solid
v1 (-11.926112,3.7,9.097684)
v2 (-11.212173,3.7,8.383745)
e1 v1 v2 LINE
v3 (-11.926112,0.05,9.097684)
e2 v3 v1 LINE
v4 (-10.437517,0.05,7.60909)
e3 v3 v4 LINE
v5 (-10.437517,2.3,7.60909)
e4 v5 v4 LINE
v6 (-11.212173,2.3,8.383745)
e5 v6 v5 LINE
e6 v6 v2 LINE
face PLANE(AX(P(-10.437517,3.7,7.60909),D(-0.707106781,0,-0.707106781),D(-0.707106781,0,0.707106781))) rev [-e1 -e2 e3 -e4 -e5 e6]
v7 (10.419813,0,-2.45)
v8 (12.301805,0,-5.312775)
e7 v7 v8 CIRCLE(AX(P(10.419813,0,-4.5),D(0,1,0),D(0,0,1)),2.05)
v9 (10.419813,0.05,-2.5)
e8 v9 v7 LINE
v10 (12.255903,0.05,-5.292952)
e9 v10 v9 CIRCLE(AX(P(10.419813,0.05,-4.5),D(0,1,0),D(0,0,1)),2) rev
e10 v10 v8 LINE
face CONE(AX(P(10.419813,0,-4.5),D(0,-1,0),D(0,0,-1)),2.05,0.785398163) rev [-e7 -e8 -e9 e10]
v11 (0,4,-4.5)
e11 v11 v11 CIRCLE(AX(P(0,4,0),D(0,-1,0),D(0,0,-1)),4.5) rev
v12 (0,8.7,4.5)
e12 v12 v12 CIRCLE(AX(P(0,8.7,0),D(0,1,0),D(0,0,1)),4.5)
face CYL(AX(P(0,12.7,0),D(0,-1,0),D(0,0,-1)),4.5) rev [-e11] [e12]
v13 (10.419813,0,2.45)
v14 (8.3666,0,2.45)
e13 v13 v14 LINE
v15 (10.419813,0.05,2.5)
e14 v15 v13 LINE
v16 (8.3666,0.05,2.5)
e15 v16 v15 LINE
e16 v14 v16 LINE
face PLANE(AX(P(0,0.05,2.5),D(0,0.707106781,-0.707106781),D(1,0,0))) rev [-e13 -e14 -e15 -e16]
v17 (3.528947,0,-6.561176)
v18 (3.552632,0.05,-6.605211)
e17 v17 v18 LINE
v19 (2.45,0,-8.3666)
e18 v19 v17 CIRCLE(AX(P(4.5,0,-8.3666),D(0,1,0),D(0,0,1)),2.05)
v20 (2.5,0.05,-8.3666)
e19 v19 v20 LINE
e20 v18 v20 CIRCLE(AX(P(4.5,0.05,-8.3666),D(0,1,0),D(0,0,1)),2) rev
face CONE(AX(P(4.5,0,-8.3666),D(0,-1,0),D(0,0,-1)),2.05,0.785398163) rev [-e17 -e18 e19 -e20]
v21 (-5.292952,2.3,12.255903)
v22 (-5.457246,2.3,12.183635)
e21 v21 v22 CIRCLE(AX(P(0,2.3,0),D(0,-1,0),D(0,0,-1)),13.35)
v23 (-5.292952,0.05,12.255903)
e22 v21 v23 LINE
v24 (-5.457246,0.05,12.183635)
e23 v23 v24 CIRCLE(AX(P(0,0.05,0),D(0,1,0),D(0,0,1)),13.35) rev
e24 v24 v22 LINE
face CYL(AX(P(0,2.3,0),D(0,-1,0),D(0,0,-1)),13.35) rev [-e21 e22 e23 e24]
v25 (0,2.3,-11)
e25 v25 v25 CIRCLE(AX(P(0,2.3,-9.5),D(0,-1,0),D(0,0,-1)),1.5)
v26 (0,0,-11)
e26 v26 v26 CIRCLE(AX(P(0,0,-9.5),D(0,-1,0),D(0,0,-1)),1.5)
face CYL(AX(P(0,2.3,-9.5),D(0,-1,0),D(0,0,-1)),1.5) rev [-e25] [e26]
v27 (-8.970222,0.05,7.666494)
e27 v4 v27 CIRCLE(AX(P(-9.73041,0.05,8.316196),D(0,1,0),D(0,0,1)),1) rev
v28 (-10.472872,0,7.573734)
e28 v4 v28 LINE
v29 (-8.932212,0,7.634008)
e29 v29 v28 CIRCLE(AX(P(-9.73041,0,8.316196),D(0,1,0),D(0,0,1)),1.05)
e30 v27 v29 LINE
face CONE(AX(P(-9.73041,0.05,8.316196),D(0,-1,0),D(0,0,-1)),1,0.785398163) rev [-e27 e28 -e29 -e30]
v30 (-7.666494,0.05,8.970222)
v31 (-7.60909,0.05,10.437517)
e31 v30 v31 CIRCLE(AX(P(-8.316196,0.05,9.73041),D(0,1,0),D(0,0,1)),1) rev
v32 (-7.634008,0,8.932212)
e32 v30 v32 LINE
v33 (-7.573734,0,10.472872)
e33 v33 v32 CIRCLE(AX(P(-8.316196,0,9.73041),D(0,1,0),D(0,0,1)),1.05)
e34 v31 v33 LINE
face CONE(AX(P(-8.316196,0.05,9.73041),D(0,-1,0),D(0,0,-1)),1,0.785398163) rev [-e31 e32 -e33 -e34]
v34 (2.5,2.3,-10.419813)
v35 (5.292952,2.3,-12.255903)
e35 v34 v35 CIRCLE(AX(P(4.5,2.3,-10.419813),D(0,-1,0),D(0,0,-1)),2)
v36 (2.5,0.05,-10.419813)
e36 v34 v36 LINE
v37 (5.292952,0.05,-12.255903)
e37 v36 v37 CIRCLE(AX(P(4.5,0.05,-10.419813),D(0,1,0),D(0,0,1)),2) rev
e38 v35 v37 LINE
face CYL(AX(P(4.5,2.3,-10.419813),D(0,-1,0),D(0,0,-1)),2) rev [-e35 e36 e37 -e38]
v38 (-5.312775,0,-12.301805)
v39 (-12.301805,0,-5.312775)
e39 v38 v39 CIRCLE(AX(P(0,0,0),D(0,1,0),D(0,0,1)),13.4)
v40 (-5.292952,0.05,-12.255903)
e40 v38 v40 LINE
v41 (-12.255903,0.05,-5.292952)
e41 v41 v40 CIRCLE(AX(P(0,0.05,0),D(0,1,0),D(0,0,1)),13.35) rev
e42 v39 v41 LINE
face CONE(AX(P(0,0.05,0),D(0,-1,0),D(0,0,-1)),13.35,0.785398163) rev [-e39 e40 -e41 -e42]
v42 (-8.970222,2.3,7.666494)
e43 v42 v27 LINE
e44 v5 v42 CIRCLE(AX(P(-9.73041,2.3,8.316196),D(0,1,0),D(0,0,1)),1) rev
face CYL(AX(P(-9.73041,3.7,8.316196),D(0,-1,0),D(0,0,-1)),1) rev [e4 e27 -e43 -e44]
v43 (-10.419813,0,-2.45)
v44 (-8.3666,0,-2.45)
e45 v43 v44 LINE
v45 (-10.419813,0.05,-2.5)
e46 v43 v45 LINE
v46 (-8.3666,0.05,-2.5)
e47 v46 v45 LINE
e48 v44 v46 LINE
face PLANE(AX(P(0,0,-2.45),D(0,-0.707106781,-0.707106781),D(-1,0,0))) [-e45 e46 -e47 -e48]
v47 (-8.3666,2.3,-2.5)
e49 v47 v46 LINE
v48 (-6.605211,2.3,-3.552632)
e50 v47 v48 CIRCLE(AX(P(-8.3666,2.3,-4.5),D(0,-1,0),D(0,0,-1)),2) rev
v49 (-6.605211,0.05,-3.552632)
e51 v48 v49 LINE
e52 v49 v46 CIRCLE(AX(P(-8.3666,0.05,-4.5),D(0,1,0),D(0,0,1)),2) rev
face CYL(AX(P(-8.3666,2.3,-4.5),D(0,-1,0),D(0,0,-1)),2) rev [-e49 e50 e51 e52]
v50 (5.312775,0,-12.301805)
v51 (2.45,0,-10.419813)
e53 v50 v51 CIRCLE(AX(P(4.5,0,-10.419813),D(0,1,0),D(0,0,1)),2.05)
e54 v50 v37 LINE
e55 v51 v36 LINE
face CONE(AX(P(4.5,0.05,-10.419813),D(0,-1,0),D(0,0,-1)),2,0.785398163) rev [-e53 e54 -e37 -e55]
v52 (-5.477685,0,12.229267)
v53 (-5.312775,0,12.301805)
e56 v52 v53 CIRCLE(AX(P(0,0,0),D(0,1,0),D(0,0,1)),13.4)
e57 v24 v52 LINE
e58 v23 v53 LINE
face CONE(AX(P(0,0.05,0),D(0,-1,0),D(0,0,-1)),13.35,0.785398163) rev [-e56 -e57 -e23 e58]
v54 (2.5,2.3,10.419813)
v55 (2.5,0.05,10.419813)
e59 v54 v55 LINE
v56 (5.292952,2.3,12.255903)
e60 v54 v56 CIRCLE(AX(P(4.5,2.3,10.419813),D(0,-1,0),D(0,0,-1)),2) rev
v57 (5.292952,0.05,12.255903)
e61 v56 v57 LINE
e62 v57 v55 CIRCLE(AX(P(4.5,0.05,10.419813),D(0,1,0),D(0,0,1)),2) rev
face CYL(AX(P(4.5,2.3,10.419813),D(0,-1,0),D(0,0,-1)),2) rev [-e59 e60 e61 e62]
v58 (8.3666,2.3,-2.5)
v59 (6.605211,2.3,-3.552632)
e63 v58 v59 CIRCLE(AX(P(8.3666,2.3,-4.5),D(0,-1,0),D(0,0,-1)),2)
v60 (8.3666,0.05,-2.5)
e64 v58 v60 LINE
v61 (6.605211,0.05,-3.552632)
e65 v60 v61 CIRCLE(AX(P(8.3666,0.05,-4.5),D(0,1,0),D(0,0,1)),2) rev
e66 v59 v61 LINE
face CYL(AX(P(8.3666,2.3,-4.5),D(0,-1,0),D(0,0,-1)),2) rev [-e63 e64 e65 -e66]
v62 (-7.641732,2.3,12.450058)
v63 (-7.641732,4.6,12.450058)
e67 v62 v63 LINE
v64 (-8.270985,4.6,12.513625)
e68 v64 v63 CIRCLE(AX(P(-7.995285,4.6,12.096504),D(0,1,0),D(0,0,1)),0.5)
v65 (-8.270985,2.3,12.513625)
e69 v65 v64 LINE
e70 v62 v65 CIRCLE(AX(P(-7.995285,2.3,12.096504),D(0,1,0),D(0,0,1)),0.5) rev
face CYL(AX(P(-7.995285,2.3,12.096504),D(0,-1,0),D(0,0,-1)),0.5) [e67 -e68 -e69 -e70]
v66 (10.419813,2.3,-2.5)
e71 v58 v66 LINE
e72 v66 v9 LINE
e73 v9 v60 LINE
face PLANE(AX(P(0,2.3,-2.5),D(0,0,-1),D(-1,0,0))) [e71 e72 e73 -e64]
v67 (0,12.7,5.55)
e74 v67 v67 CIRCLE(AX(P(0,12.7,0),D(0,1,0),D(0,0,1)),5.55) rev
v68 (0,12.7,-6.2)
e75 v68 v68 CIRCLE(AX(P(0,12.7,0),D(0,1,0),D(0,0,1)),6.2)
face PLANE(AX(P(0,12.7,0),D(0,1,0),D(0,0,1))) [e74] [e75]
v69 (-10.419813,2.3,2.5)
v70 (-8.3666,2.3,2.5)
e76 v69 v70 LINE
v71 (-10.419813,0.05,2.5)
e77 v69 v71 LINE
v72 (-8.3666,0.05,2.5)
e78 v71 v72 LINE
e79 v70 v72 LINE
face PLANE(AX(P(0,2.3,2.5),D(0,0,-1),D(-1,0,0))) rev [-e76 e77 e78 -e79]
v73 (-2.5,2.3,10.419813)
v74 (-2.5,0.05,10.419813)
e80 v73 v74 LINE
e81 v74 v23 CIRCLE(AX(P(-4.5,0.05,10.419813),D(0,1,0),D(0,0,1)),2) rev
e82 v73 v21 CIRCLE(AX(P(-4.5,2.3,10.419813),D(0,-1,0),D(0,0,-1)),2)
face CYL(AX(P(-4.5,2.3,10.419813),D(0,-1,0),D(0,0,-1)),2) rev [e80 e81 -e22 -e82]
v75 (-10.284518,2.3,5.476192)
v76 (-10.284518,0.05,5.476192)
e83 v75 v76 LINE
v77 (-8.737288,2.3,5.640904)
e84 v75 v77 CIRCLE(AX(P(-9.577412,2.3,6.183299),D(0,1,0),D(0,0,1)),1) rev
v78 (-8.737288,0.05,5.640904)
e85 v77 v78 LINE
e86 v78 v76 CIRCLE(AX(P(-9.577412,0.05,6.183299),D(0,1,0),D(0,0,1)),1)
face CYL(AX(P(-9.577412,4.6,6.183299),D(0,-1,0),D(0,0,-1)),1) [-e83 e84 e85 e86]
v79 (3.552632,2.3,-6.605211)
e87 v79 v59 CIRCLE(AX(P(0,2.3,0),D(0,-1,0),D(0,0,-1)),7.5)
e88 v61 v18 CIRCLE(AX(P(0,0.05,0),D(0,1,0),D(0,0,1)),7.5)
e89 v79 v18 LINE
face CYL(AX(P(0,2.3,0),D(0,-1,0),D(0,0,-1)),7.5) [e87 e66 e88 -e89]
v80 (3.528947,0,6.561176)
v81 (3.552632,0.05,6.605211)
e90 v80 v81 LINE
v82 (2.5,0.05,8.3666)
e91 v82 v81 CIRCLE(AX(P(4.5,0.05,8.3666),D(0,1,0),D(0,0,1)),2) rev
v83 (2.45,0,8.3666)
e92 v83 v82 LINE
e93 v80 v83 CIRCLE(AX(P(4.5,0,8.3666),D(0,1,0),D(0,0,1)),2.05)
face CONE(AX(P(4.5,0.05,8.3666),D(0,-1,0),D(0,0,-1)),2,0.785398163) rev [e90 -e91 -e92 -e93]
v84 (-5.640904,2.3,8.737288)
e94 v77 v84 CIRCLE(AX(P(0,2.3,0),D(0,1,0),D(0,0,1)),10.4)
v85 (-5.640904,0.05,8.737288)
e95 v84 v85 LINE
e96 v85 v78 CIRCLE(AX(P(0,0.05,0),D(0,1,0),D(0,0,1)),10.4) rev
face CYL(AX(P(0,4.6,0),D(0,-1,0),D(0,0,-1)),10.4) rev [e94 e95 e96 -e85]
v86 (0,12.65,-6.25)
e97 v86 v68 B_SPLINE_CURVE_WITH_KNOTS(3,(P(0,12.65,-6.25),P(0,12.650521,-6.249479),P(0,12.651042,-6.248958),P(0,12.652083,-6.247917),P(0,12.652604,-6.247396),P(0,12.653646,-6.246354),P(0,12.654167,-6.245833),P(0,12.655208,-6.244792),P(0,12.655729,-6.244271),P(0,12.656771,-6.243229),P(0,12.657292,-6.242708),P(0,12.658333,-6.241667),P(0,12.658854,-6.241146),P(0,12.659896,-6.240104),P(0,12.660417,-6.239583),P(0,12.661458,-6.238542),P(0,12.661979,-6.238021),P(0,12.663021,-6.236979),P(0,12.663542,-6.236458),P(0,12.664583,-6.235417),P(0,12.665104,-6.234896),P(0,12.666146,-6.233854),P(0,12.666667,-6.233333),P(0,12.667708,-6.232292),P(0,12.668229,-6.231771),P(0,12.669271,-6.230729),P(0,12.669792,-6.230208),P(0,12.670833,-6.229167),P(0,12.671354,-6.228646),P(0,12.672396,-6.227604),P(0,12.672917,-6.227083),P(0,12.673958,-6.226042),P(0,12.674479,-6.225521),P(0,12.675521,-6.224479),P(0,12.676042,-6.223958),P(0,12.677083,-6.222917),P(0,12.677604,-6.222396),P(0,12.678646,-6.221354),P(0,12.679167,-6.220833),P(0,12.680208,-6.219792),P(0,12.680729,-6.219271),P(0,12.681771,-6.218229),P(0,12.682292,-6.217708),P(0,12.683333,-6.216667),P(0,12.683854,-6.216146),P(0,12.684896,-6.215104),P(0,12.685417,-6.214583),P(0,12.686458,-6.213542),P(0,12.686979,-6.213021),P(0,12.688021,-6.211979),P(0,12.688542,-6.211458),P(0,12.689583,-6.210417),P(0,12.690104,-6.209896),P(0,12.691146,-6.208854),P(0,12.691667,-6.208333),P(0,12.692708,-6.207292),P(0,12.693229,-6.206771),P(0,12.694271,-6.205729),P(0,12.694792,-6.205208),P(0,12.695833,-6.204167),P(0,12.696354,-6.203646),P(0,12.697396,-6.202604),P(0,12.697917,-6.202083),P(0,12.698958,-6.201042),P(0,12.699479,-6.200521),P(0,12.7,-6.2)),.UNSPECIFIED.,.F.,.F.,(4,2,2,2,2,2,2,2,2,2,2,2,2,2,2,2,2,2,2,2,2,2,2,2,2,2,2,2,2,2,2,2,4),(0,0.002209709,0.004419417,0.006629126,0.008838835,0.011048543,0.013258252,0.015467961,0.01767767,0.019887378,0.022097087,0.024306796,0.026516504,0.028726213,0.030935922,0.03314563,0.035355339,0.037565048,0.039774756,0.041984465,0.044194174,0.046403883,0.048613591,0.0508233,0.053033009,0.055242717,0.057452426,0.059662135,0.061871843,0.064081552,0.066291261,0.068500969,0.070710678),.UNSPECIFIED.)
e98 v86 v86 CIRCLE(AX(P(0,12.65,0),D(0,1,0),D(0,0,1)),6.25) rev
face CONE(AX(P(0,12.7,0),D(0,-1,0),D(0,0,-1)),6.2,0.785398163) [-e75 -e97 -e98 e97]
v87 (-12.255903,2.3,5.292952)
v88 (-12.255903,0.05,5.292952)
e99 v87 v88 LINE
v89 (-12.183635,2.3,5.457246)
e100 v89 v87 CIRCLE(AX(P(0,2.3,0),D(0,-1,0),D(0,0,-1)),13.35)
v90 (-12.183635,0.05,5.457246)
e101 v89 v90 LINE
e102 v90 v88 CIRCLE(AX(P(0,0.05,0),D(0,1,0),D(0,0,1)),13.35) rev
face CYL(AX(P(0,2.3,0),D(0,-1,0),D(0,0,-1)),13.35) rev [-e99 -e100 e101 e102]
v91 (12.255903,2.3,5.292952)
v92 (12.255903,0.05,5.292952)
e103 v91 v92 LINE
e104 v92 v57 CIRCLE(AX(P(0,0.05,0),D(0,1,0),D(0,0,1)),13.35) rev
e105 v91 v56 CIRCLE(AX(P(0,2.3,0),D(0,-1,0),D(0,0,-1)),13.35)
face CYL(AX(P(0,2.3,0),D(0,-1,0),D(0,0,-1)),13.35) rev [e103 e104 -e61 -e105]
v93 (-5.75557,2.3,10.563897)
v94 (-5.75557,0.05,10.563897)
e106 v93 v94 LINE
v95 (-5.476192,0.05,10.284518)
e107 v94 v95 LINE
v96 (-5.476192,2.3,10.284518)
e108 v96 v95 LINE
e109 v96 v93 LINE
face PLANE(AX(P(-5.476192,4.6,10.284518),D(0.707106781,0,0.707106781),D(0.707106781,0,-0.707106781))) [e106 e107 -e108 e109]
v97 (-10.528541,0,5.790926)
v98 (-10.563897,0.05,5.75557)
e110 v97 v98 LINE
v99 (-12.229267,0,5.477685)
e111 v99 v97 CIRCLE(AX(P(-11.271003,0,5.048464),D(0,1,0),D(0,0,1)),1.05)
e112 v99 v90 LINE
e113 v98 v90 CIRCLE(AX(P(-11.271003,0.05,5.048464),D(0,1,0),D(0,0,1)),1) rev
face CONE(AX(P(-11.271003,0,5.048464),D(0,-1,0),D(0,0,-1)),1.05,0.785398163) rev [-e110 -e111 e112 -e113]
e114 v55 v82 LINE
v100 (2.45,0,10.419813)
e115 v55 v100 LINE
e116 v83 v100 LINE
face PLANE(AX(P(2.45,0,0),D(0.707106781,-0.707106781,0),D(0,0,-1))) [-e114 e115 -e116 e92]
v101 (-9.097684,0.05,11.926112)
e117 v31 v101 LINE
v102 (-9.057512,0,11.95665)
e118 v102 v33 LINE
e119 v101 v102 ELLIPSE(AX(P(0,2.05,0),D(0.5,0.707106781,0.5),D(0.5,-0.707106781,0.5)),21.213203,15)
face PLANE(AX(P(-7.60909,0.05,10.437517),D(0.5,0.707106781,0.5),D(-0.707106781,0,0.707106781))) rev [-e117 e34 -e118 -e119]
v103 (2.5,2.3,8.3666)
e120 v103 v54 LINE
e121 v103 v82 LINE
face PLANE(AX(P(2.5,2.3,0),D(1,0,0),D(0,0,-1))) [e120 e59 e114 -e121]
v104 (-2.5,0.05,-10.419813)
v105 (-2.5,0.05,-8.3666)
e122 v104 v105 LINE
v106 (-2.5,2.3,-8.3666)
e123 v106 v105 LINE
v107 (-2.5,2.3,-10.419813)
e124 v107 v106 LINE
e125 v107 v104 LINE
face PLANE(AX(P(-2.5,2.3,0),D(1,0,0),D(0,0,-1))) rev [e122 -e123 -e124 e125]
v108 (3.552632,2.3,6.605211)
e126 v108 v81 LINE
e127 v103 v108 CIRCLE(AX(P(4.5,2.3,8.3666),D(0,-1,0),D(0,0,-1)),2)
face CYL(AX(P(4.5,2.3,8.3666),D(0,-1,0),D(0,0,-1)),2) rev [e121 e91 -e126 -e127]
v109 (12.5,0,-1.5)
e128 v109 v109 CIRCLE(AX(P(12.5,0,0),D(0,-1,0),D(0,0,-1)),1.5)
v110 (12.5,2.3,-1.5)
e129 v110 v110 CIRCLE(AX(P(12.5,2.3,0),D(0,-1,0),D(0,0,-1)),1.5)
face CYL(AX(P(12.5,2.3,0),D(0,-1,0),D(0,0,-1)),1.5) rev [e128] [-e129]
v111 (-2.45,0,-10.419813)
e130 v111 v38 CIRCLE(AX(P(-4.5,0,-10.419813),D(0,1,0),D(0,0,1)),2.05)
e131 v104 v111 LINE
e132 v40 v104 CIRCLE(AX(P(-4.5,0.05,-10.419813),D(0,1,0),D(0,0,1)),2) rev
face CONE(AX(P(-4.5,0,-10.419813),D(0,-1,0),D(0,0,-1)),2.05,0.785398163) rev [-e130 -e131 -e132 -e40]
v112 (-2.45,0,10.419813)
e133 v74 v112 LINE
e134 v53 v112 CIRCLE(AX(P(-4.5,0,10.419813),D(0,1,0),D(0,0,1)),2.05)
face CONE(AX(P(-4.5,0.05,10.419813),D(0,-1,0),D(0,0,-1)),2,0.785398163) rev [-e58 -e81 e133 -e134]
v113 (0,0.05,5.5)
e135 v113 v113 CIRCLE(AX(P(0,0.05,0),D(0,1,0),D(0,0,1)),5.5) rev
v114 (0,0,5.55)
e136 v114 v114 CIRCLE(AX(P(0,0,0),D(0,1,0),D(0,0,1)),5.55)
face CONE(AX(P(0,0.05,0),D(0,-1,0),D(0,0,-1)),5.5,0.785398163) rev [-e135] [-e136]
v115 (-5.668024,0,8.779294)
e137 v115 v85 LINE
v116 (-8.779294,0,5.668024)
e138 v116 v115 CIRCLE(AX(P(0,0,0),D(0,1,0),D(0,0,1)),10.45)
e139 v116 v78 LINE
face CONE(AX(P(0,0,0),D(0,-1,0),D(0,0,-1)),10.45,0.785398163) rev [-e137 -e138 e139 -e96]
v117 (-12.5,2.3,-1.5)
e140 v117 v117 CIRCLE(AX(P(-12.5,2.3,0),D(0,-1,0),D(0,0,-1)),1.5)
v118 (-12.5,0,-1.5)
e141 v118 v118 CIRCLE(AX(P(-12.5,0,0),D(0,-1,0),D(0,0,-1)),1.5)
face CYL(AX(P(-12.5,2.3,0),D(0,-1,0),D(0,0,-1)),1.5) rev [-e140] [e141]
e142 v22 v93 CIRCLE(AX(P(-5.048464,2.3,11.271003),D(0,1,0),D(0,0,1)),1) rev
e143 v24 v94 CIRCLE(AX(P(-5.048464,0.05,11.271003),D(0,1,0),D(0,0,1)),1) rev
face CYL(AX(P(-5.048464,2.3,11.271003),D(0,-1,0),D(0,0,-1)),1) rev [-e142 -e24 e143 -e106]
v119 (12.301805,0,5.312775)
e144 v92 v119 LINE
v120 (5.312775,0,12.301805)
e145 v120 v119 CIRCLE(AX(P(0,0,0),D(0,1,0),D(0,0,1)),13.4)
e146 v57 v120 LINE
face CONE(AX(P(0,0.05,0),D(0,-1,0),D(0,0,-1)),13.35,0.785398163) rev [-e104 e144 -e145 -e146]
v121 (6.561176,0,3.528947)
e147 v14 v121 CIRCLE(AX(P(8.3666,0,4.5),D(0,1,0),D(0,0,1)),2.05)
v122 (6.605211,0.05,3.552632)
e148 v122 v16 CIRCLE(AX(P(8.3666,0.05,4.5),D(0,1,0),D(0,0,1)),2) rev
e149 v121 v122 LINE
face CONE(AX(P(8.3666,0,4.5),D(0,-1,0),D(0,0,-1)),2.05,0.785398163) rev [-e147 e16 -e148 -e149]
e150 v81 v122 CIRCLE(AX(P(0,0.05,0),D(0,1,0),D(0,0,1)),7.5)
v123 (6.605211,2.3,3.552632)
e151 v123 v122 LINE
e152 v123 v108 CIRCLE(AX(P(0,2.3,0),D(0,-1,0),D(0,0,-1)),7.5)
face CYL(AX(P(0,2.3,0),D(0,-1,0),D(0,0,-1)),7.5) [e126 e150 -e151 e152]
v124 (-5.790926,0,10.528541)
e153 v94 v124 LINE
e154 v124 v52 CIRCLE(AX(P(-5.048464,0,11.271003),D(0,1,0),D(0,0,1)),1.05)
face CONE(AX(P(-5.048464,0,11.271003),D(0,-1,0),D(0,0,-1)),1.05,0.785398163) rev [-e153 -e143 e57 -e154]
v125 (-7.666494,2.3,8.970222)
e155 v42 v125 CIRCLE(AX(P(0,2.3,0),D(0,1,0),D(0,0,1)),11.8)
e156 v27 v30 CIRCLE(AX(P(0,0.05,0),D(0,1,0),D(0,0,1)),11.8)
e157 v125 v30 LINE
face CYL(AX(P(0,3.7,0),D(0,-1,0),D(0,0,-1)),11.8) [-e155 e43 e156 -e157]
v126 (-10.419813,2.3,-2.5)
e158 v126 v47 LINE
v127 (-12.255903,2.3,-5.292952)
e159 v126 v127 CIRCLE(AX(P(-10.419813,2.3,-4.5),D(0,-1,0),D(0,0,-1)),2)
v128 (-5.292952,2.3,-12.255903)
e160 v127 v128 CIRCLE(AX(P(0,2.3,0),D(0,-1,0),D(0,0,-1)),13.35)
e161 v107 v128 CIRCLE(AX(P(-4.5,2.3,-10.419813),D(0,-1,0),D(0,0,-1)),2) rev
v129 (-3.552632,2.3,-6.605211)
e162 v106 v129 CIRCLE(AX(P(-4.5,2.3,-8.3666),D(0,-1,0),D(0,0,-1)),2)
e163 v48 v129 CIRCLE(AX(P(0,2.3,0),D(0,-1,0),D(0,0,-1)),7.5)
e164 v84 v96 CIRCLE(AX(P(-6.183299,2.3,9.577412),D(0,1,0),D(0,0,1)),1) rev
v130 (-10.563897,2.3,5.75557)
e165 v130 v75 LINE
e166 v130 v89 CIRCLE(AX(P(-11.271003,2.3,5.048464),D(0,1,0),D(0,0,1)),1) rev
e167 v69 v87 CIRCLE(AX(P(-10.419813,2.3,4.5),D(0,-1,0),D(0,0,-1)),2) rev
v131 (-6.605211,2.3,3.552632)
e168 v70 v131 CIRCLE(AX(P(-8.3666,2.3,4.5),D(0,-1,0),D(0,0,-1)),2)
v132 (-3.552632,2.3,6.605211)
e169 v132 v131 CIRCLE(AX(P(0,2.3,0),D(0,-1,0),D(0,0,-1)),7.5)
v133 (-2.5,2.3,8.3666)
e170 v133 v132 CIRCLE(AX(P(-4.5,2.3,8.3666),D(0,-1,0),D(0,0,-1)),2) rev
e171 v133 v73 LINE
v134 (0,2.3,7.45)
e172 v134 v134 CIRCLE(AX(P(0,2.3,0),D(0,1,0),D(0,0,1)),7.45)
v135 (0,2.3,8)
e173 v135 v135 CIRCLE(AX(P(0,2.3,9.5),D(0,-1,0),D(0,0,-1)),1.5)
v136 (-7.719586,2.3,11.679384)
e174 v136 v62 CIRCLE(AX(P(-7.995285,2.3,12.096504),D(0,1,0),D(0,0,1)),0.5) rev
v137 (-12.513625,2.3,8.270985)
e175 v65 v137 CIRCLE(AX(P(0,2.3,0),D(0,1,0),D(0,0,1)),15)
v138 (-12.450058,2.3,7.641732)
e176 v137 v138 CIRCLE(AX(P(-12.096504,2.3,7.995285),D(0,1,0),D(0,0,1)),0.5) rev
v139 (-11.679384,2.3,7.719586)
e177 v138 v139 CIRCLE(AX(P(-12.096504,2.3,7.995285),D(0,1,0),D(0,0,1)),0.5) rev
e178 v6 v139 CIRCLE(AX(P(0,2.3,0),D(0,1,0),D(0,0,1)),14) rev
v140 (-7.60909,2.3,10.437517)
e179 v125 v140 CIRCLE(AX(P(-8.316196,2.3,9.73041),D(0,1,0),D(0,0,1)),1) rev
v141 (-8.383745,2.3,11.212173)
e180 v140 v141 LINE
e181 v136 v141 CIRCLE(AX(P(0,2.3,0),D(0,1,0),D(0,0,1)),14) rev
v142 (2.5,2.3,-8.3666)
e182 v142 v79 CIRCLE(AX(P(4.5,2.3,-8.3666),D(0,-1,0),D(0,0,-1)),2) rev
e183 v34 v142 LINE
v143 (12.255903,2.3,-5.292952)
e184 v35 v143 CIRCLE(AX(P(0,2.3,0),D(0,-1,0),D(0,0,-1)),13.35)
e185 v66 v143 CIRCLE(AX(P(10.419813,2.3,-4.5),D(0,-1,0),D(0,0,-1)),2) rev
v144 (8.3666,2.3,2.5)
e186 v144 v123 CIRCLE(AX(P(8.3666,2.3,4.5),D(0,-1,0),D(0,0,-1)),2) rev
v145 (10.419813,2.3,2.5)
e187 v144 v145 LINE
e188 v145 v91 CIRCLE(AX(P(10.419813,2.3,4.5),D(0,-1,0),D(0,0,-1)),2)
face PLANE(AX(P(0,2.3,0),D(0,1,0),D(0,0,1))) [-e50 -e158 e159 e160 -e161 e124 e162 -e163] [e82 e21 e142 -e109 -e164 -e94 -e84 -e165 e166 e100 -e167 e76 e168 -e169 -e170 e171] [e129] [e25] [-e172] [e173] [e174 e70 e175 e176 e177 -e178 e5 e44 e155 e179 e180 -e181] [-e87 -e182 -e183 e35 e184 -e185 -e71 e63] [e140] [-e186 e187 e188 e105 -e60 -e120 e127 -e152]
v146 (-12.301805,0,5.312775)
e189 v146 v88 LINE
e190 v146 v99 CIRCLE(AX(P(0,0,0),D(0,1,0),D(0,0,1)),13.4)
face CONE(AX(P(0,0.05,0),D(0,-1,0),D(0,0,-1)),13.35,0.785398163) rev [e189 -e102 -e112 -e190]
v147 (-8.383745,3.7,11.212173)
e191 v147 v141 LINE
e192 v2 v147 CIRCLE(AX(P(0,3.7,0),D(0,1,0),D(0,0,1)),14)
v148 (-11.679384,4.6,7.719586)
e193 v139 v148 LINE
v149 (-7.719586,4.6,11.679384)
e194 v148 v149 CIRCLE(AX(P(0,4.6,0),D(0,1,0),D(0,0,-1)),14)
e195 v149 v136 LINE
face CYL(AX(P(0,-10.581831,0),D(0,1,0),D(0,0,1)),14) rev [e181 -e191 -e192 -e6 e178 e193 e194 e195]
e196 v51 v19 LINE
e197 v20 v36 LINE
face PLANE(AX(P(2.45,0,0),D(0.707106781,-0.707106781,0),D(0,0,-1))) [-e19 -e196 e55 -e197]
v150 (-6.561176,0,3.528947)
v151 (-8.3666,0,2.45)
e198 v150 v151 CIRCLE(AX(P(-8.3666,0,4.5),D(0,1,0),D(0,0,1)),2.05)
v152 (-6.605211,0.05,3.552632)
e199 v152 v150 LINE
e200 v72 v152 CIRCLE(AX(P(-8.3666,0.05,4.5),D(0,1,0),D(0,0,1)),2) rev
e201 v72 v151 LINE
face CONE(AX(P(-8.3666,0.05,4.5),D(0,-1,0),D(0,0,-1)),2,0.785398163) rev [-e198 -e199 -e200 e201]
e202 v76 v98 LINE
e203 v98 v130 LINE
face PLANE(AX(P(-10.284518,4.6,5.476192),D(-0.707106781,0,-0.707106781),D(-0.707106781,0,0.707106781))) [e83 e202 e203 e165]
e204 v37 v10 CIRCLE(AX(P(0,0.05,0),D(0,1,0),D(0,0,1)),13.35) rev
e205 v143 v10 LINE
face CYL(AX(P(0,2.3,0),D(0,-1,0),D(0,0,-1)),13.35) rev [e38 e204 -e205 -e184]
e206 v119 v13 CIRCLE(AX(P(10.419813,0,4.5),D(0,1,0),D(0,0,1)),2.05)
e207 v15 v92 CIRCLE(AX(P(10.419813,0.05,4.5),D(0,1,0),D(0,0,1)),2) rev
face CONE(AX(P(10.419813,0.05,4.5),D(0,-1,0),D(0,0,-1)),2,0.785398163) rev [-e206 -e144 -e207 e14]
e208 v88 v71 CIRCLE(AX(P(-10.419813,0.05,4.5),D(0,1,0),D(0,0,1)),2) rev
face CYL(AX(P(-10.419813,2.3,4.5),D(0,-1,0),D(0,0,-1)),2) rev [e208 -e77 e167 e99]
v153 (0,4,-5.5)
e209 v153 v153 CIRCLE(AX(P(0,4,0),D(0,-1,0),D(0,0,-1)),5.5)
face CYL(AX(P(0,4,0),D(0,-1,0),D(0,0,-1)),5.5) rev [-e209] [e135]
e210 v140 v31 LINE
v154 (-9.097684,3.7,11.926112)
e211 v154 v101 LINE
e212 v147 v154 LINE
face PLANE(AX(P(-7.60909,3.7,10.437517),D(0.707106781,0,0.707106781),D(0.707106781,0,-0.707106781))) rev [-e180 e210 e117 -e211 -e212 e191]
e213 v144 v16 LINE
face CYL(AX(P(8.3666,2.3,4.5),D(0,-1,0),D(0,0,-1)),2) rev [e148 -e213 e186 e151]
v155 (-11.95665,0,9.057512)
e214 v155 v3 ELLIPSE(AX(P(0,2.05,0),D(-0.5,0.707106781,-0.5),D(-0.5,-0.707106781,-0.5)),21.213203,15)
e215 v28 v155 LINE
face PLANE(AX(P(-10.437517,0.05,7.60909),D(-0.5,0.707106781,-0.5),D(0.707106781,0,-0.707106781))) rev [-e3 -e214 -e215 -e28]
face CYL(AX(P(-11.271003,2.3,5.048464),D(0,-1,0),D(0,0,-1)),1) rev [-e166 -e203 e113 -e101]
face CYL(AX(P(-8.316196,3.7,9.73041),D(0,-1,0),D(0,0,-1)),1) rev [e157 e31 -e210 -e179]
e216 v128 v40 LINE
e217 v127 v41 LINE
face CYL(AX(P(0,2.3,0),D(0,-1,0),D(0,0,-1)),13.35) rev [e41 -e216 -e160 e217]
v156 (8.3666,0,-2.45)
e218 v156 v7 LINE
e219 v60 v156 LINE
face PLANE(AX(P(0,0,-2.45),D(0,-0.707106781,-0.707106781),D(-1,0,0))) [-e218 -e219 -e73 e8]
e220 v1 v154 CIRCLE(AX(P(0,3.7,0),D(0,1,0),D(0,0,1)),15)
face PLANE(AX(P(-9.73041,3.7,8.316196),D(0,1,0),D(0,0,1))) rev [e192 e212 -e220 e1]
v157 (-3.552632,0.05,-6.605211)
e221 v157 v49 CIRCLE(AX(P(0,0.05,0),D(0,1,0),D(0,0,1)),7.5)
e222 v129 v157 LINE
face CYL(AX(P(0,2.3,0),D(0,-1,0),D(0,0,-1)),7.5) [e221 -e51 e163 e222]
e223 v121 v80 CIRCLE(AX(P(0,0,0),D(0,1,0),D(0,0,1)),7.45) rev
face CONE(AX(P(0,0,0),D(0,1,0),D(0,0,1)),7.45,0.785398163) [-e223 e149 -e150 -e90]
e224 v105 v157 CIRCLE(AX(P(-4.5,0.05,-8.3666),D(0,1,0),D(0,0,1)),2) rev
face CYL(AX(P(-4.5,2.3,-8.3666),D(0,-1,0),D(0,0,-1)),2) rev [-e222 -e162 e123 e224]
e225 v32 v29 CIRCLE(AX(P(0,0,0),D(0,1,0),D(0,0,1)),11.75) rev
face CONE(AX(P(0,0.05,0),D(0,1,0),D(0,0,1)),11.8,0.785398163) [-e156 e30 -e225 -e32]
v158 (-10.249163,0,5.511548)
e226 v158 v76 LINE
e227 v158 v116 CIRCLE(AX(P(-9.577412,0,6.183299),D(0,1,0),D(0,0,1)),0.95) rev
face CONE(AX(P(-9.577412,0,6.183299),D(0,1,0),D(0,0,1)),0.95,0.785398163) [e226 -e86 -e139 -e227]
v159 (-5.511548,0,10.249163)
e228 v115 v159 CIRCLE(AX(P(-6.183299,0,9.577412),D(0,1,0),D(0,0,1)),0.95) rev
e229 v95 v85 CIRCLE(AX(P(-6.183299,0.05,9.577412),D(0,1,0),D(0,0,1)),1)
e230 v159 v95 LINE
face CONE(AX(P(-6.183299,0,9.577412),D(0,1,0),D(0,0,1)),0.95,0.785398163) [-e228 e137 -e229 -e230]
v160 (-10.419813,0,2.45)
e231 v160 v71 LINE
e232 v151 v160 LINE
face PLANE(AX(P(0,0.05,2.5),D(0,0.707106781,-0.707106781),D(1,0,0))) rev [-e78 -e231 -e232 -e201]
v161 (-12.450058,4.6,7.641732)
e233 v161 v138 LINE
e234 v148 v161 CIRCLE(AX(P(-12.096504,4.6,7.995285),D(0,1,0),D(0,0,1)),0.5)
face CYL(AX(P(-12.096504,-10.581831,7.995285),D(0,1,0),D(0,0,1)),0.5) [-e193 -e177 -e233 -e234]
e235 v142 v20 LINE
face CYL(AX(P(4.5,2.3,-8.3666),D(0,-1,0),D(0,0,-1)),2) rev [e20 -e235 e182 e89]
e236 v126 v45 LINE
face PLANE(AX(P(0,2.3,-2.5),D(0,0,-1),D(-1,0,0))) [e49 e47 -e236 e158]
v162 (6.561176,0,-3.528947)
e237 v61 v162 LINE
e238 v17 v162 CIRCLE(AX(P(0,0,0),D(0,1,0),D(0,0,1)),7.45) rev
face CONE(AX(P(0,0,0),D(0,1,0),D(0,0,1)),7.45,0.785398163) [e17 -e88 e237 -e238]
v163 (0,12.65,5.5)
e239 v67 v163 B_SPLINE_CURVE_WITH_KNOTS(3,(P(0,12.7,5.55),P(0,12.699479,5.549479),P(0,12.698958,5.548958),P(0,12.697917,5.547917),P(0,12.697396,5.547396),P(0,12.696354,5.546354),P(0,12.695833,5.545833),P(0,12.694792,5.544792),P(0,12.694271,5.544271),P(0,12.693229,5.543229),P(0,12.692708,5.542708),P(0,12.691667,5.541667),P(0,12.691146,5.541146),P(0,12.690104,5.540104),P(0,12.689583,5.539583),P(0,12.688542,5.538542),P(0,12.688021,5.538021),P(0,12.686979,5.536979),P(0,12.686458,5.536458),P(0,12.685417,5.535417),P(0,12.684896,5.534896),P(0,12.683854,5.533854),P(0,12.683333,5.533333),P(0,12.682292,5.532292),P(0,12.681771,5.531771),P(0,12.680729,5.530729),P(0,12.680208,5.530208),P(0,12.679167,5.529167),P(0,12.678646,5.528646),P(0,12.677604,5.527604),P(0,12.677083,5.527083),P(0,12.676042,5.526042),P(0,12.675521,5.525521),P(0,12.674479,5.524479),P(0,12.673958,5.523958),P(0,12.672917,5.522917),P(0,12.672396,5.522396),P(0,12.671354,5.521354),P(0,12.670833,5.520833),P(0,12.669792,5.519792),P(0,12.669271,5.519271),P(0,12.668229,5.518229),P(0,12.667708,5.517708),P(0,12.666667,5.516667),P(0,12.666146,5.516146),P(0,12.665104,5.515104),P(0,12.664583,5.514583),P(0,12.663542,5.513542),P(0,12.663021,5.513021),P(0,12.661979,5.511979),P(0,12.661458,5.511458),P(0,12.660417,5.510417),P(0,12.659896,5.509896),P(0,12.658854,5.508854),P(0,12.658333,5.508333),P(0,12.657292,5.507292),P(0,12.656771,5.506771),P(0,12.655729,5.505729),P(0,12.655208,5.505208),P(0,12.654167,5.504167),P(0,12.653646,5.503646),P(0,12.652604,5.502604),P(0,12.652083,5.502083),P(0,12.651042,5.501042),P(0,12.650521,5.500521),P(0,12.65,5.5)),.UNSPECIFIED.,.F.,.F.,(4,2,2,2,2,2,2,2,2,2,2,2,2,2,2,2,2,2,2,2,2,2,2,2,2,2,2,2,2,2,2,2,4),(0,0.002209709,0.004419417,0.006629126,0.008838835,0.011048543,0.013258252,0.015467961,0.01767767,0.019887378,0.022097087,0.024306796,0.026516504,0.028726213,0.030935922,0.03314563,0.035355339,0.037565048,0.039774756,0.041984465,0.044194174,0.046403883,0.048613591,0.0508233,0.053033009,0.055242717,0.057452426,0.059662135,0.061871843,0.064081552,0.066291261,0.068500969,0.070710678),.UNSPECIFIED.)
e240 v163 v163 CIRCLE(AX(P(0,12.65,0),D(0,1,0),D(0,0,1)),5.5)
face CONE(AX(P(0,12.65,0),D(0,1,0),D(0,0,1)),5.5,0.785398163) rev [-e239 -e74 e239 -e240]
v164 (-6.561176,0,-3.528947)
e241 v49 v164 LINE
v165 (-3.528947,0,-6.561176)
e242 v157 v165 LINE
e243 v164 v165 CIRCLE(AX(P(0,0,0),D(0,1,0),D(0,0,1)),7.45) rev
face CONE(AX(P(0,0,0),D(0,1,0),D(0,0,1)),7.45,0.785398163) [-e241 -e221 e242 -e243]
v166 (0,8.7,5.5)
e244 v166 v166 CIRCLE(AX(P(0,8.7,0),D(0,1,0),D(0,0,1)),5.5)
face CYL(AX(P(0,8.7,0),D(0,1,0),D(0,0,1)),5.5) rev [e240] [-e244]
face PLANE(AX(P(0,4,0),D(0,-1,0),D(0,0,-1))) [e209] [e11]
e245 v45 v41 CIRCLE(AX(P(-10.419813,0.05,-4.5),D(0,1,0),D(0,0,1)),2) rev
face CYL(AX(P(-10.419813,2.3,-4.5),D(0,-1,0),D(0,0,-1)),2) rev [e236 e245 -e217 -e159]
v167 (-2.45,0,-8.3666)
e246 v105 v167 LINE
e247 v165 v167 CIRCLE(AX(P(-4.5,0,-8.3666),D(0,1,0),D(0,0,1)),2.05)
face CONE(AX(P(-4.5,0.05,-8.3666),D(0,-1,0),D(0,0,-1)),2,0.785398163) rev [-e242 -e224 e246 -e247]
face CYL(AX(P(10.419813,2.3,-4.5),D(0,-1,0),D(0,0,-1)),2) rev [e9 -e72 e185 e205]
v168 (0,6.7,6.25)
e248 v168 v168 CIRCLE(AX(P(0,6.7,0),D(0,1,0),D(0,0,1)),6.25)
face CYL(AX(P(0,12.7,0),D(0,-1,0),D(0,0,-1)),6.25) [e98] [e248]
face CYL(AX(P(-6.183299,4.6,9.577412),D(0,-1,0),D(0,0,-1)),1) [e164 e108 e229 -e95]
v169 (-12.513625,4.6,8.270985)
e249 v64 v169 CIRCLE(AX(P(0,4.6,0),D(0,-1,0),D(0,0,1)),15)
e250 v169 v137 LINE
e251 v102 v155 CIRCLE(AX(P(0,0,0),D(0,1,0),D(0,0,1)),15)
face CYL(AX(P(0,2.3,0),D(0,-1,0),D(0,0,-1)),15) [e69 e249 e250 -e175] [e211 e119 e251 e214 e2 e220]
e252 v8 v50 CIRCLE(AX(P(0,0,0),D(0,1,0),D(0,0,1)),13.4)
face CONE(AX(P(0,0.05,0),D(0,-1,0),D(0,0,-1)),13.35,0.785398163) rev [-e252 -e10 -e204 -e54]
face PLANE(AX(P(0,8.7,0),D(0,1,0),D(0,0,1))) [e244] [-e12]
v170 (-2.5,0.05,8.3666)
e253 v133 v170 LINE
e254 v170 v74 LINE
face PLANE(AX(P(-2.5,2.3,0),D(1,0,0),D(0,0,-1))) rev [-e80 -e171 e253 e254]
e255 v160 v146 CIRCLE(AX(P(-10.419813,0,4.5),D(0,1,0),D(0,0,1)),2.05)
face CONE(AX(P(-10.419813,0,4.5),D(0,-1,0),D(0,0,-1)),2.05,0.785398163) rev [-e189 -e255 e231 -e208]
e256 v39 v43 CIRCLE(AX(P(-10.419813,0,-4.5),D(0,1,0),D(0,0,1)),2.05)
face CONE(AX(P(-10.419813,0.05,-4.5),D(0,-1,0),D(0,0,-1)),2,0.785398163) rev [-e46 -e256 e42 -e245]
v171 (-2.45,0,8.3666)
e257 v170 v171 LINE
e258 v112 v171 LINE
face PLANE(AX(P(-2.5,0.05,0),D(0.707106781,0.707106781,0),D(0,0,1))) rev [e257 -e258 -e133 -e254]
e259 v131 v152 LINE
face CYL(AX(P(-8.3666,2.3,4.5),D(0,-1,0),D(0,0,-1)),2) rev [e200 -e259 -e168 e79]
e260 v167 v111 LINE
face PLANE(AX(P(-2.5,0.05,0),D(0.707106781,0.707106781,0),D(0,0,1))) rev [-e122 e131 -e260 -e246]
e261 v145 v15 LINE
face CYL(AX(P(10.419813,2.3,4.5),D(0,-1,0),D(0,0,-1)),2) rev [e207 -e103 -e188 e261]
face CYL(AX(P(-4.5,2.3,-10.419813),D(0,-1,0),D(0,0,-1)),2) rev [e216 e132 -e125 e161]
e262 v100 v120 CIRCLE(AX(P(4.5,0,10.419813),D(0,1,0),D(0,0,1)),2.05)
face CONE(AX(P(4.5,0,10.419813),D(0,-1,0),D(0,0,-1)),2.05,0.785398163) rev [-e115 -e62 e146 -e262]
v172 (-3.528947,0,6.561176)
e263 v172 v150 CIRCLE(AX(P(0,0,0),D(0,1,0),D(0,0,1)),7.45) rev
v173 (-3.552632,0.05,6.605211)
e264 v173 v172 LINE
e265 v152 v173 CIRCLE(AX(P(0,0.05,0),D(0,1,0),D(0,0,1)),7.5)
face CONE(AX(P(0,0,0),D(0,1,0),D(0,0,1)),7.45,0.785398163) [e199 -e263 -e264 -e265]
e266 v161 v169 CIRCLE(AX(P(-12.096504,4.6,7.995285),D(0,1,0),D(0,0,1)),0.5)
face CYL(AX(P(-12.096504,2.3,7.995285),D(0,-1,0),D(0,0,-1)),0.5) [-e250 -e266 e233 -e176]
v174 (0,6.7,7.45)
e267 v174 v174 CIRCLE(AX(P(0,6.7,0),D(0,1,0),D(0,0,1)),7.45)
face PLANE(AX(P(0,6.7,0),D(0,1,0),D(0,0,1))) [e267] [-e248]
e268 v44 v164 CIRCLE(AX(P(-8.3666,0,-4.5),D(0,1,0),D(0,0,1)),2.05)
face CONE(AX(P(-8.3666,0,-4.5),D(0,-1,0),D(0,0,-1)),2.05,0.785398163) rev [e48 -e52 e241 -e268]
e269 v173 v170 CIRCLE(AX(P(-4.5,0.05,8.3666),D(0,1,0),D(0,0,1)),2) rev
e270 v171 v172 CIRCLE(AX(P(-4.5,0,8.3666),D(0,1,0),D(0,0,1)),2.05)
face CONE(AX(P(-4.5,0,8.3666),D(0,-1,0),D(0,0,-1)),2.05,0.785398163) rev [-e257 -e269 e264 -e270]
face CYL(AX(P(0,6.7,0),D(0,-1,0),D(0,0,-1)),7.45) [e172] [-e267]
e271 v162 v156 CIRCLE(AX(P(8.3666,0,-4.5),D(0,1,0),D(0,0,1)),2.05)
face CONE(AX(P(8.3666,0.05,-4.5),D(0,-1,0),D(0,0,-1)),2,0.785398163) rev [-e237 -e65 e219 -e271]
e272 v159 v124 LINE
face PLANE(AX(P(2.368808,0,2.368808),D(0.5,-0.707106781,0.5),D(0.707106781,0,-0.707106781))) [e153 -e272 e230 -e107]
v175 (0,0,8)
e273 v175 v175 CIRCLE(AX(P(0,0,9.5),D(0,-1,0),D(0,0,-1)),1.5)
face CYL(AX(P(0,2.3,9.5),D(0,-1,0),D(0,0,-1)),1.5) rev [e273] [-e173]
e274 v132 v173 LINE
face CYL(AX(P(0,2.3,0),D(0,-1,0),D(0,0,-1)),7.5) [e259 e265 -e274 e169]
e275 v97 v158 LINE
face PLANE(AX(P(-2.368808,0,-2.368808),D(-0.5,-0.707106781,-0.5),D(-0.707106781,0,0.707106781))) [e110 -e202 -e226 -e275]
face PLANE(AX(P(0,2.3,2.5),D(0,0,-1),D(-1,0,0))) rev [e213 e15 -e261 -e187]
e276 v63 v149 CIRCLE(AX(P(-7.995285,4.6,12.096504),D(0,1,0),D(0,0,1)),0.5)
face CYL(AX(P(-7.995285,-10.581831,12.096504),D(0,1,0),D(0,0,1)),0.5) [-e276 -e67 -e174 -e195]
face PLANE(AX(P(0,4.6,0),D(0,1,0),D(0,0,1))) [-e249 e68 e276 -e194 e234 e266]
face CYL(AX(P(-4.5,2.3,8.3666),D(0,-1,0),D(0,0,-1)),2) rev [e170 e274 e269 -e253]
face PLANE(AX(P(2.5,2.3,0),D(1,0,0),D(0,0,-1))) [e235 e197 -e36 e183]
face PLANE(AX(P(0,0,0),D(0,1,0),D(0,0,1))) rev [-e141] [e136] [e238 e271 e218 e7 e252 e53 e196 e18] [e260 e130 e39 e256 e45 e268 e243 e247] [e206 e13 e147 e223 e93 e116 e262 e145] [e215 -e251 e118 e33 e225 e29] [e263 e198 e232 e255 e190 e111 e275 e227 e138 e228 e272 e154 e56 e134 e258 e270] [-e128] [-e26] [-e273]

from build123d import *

# Parameters (mm, degrees)
SKETCH_1_R          = 15
EXTRUDE_1_DEPTH     = 2.3
SKETCH_2_R          = 1.5
CUT_EXTRUDE_1_DEPTH = 2.3
EXTRUDE_2_DEPTH     = 4.6
CUT_EXTRUDE_2_DEPTH = 3.7
CUT_EXTRUDE_START   = -2.3
CUT_EXTRUDE_3_DEPTH = 2.3
FILLET_1_R          = 1
SKETCH_6_R          = 7.45
EXTRUDE_3_DEPTH     = 4.4
SKETCH_7_R          = 6.25
EXTRUDE_4_DEPTH     = 6
SKETCH_8_R          = 5.5
CUT_EXTRUDE_4_DEPTH = 4
SKETCH_9_R          = 4.5
CUT_EXTRUDE_5_DEPTH = 25.724279565
CUT_EXTRUDE_START_2 = -4
SKETCH_10_R         = 5.5
CUT_EXTRUDE_6_DEPTH = 4
CHAMFER_1_SIZE      = 0.05
FILLET_2_R          = 0.5


with BuildPart() as part:
    # Эскиз1 → Бобышка-Вытянуть1 (new body)
    with BuildSketch(Plane(origin=(0, 0, 0), x_dir=(1, 0, 0), z_dir=(0, 1, 0))):
        with Locations(Location((0, 0, 0), (0, 0, 270))):
            Circle(SKETCH_1_R)
    extrude(amount=EXTRUDE_1_DEPTH)

    # Эскиз2 → Вырез-Вытянуть1 (cut)
    with BuildSketch(Plane.XZ):
        with BuildLine():
            ThreePointArc((-10.419812858, 2.5), (-12.091025454, 3.401342429), (-12.25590323, 5.292951542))
            ThreePointArc((-12.25590323, 5.292951542), (-9.439875529, 9.439875529), (-5.292951542, 12.25590323))
            ThreePointArc((-5.292951542, 12.25590323), (-3.401342429, 12.091025454), (-2.5, 10.419812858))
            Line((-2.5, 10.419812858), (-2.5, 8.366600265))
            ThreePointArc((-2.5, 8.366600265), (-2.783209849, 7.340621913), (-3.552631579, 6.605210736))
            ThreePointArc((-3.552631579, 6.605210736), (-5.303300859, 5.303300859), (-6.605210736, 3.552631579))
            ThreePointArc((-6.605210736, 3.552631579), (-7.340621913, 2.783209849), (-8.366600265, 2.5))
            Line((-8.366600265, 2.5), (-10.419812858, 2.5))
        make_face()
        with Locations(Location((0, 9.5, 0), (0, 0, 270))):
            Circle(SKETCH_2_R)
        with BuildLine():
            ThreePointArc((2.5, 10.419812858), (3.401342429, 12.091025454), (5.292951542, 12.25590323))
            ThreePointArc((5.292951542, 12.25590323), (9.439875529, 9.439875529), (12.25590323, 5.292951542))
            ThreePointArc((12.25590323, 5.292951542), (12.091025454, 3.401342429), (10.419812858, 2.5))
            Line((10.419812858, 2.5), (8.366600265, 2.5))
            ThreePointArc((8.366600265, 2.5), (7.340621913, 2.783209849), (6.605210736, 3.552631579))
            ThreePointArc((6.605210736, 3.552631579), (5.303300859, 5.303300859), (3.552631579, 6.605210736))
            ThreePointArc((3.552631579, 6.605210736), (2.783209849, 7.340621913), (2.5, 8.366600265))
            Line((2.5, 8.366600265), (2.5, 10.419812858))
        make_face()
        with Locations(Location((12.5, 0, 0), (0, 0, 270))):
            Circle(SKETCH_2_R)
        with BuildLine():
            ThreePointArc((10.419812858, -2.5), (12.091025454, -3.401342429), (12.25590323, -5.292951542))
            ThreePointArc((12.25590323, -5.292951542), (9.439875529, -9.439875529), (5.292951542, -12.25590323))
            ThreePointArc((5.292951542, -12.25590323), (3.401342429, -12.091025454), (2.5, -10.419812858))
            Line((2.5, -10.419812858), (2.5, -8.366600265))
            ThreePointArc((2.5, -8.366600265), (2.783209849, -7.340621913), (3.552631579, -6.605210736))
            ThreePointArc((3.552631579, -6.605210736), (5.303300859, -5.303300859), (6.605210736, -3.552631579))
            ThreePointArc((6.605210736, -3.552631579), (7.340621913, -2.783209849), (8.366600265, -2.5))
            Line((8.366600265, -2.5), (10.419812858, -2.5))
        make_face()
        with Locations(Location((0, -9.5, 0), (0, 0, 270))):
            Circle(SKETCH_2_R)
        with BuildLine():
            ThreePointArc((-2.5, -10.419812858), (-3.401342429, -12.091025454), (-5.292951542, -12.25590323))
            ThreePointArc((-5.292951542, -12.25590323), (-9.439875529, -9.439875529), (-12.25590323, -5.292951542))
            ThreePointArc((-12.25590323, -5.292951542), (-12.091025454, -3.401342429), (-10.419812858, -2.5))
            Line((-10.419812858, -2.5), (-8.366600265, -2.5))
            ThreePointArc((-8.366600265, -2.5), (-7.340621913, -2.783209849), (-6.605210736, -3.552631579))
            ThreePointArc((-6.605210736, -3.552631579), (-5.303300859, -5.303300859), (-3.552631579, -6.605210736))
            ThreePointArc((-3.552631579, -6.605210736), (-2.783209849, -7.340621913), (-2.5, -8.366600265))
            Line((-2.5, -8.366600265), (-2.5, -10.419812858))
        make_face()
        with Locations(Location((-12.5, 0, 0), (0, 0, 270))):
            Circle(SKETCH_2_R)
    extrude(amount=-CUT_EXTRUDE_1_DEPTH, mode=Mode.SUBTRACT)

    # Эскиз3 → Бобышка-Вытянуть2 (add)
    with BuildSketch(Plane.XZ):
        with BuildLine():
            Line((-5.476192266, 10.284518378), (-7.9263742, 12.734700312))
            ThreePointArc((-7.9263742, 12.734700312), (-10.606601718, 10.606601718), (-12.734700312, 7.9263742))
            Line((-12.734700312, 7.9263742), (-10.284518378, 5.476192266))
            ThreePointArc((-10.284518378, 5.476192266), (-9.471553651, 5.188917785), (-8.737287773, 5.640904394))
            ThreePointArc((-8.737287773, 5.640904394), (-7.353910524, 7.353910524), (-5.640904394, 8.737287773))
            ThreePointArc((-5.640904394, 8.737287773), (-5.188917785, 9.471553651), (-5.476192266, 10.284518378))
        make_face()
    extrude(amount=-EXTRUDE_2_DEPTH)

    # Эскиз4 → Вырез-Вытянуть2 (cut)
    with BuildSketch(Plane.XZ):
        with BuildLine():
            Line((-7.609089602, 10.437516727), (-11.362124092, 14.190551216))
            Line((-11.362124092, 14.190551216), (-14.190551216, 11.362124092))
            Line((-14.190551216, 11.362124092), (-10.437516727, 7.609089602))
            ThreePointArc((-10.437516727, 7.609089602), (-9.691317564, 7.316960783), (-8.970221669, 7.666493541))
            ThreePointArc((-8.970221669, 7.666493541), (-8.343860018, 8.343860018), (-7.666493541, 8.970221669))
            ThreePointArc((-7.666493541, 8.970221669), (-7.316960783, 9.691317564), (-7.609089602, 10.437516727))
        make_face()
    extrude(amount=-CUT_EXTRUDE_2_DEPTH, mode=Mode.SUBTRACT)

    # Эскиз5 → Вырез-Вытянуть3 (cut)
    with BuildSketch(Plane(origin=(0, 4.6, 0), x_dir=(1, 0, 0), z_dir=(0, 1, 0)).offset(CUT_EXTRUDE_START)):
        with BuildLine():
            Line((-12.937905898, -5.348886891), (-9.109525824, -3.766129051))
            Line((-9.109525824, -3.766129051), (-3.979530291, -8.038651188))
            Line((-3.979530291, -8.038651188), (-5.138314359, -13.022969152))
            ThreePointArc((-5.138314359, -13.022969152), (-9.818875666, -9.979462944), (-12.937905898, -5.348886891))
        make_face()
    extrude(amount=CUT_EXTRUDE_3_DEPTH, mode=Mode.SUBTRACT)

    # Скругление1
    fillet_1_edges = [part.edges().sort_by_distance(p)[0] for p in [
        (-11.532758238, 1.15, 6.724432126),
        (-6.724432126, 1.15, 11.532758238),
    ]]
    fillet(fillet_1_edges, radius=FILLET_1_R)

    # Эскиз6 → Бобышка-Вытянуть3 (add)
    with BuildSketch(Plane(origin=(0, 2.3, 0), x_dir=(1, 0, 0), z_dir=(0, 1, 0))):
        with Locations(Location((0, 0, 0), (0, 0, 270))):
            Circle(SKETCH_6_R)
    extrude(amount=EXTRUDE_3_DEPTH)

    # Эскиз7 → Бобышка-Вытянуть4 (add)
    with BuildSketch(Plane(origin=(0, 6.7, 0), x_dir=(1, 0, 0), z_dir=(0, 1, 0))):
        with Locations(Location((0, 0, 0), (0, 0, 270))):
            Circle(SKETCH_7_R)
    extrude(amount=EXTRUDE_4_DEPTH)

    # Эскиз8 → Вырез-Вытянуть4 (cut)
    with BuildSketch(Plane(origin=(0, 12.7, 0), x_dir=(1, 0, 0), z_dir=(0, 1, 0))):
        with Locations(Location((0, 0, 0), (0, 0, 270))):
            Circle(SKETCH_8_R)
    extrude(amount=-CUT_EXTRUDE_4_DEPTH, mode=Mode.SUBTRACT)

    # Эскиз9 → Вырез-Вытянуть5 (cut, through all)
    with BuildSketch(Plane.XZ):
        with Locations(Location((0, 0, 0), (0, 0, 270))):
            Circle(SKETCH_9_R)
    extrude(amount=-CUT_EXTRUDE_5_DEPTH, mode=Mode.SUBTRACT)

    # Эскиз10 → Вырез-Вытянуть6 (cut)
    with BuildSketch(Plane.XZ.offset(CUT_EXTRUDE_START_2)):
        with Locations(Location((0, 0, 0), (0, 0, 90))):
            Circle(SKETCH_10_R)
    extrude(amount=CUT_EXTRUDE_6_DEPTH, mode=Mode.SUBTRACT)

    # Фаска1
    chamfer_1_edges = [part.edges().sort_by_distance(p)[0] for p in [
        (-5.615881331, 0, 10.424207443),
        (-9.471553651, 0, 5.188917785),
        (-7.353910524, 0, 7.353910524),
        (-5.188917785, 0, 9.471553651),
        (-11.181814155, 0, 8.35338703),
        (-9.691317564, 0, 7.316960783),
        (-8.343860018, 0, 8.343860018),
        (-7.316960783, 0, 9.691317564),
        (-8.35338703, 0, 11.181814155),
        (-12.220045296, 0, 5.375220272),
        (-10.424207443, 0, 5.615881331),
        (-6.03192206, 0, 11.452137177),
        (-11.452137177, 0, 6.03192206),
        (0, 12.7, -6.25),
        (0, 12.7, -5.5),
        (0, 0, -5.5),
        (3.401342429, 0, 12.091025454),
        (7.340621913, 0, 2.783209849),
        (5.303300859, 0, 5.303300859),
        (2.5, 0, 9.393206562),
        (2.783209849, 0, 7.340621913),
        (9.393206562, 0, 2.5),
        (12.091025454, 0, 3.401342429),
        (9.439875529, 0, 9.439875529),
        (12.091025454, 0, -3.401342429),
        (2.5, 0, -9.393206562),
        (2.783209849, 0, -7.340621913),
        (5.303300859, 0, -5.303300859),
        (9.393206562, 0, -2.5),
        (7.340621913, 0, -2.783209849),
        (3.401342429, 0, -12.091025454),
        (9.439875529, 0, -9.439875529),
        (-3.401342429, 0, -12.091025454),
        (-9.393206562, 0, -2.5),
        (-7.340621913, 0, -2.783209849),
        (-5.303300859, 0, -5.303300859),
        (-2.5, 0, -9.393206562),
        (-2.783209849, 0, -7.340621913),
        (-12.091025454, 0, -3.401342429),
        (-9.439875529, 0, -9.439875529),
        (-12.091025454, 0, 3.401342429),
        (-2.783209849, 0, 7.340621913),
        (-5.303300859, 0, 5.303300859),
        (-9.393206562, 0, 2.5),
        (-7.340621913, 0, 2.783209849),
        (-2.5, 0, 9.393206562),
        (-3.401342429, 0, 12.091025454),
        (-5.375220272, 0, 12.220045296),
    ]]
    chamfer(chamfer_1_edges, length=CHAMFER_1_SIZE)

    # Скругление2
    fillet_2_edges = [part.edges().sort_by_distance(p)[0] for p in [
        (-7.9263742, 3.45, 12.734700312),
        (-7.198961436, 3.45, 12.007287548),
        (-12.734700312, 3.45, 7.9263742),
        (-12.007287548, 3.45, 7.198961436),
    ]]
    fillet(fillet_2_edges, radius=FILLET_2_R - 0.0001)  # a hair under: the kernel refuses the full size


solid = part.part
